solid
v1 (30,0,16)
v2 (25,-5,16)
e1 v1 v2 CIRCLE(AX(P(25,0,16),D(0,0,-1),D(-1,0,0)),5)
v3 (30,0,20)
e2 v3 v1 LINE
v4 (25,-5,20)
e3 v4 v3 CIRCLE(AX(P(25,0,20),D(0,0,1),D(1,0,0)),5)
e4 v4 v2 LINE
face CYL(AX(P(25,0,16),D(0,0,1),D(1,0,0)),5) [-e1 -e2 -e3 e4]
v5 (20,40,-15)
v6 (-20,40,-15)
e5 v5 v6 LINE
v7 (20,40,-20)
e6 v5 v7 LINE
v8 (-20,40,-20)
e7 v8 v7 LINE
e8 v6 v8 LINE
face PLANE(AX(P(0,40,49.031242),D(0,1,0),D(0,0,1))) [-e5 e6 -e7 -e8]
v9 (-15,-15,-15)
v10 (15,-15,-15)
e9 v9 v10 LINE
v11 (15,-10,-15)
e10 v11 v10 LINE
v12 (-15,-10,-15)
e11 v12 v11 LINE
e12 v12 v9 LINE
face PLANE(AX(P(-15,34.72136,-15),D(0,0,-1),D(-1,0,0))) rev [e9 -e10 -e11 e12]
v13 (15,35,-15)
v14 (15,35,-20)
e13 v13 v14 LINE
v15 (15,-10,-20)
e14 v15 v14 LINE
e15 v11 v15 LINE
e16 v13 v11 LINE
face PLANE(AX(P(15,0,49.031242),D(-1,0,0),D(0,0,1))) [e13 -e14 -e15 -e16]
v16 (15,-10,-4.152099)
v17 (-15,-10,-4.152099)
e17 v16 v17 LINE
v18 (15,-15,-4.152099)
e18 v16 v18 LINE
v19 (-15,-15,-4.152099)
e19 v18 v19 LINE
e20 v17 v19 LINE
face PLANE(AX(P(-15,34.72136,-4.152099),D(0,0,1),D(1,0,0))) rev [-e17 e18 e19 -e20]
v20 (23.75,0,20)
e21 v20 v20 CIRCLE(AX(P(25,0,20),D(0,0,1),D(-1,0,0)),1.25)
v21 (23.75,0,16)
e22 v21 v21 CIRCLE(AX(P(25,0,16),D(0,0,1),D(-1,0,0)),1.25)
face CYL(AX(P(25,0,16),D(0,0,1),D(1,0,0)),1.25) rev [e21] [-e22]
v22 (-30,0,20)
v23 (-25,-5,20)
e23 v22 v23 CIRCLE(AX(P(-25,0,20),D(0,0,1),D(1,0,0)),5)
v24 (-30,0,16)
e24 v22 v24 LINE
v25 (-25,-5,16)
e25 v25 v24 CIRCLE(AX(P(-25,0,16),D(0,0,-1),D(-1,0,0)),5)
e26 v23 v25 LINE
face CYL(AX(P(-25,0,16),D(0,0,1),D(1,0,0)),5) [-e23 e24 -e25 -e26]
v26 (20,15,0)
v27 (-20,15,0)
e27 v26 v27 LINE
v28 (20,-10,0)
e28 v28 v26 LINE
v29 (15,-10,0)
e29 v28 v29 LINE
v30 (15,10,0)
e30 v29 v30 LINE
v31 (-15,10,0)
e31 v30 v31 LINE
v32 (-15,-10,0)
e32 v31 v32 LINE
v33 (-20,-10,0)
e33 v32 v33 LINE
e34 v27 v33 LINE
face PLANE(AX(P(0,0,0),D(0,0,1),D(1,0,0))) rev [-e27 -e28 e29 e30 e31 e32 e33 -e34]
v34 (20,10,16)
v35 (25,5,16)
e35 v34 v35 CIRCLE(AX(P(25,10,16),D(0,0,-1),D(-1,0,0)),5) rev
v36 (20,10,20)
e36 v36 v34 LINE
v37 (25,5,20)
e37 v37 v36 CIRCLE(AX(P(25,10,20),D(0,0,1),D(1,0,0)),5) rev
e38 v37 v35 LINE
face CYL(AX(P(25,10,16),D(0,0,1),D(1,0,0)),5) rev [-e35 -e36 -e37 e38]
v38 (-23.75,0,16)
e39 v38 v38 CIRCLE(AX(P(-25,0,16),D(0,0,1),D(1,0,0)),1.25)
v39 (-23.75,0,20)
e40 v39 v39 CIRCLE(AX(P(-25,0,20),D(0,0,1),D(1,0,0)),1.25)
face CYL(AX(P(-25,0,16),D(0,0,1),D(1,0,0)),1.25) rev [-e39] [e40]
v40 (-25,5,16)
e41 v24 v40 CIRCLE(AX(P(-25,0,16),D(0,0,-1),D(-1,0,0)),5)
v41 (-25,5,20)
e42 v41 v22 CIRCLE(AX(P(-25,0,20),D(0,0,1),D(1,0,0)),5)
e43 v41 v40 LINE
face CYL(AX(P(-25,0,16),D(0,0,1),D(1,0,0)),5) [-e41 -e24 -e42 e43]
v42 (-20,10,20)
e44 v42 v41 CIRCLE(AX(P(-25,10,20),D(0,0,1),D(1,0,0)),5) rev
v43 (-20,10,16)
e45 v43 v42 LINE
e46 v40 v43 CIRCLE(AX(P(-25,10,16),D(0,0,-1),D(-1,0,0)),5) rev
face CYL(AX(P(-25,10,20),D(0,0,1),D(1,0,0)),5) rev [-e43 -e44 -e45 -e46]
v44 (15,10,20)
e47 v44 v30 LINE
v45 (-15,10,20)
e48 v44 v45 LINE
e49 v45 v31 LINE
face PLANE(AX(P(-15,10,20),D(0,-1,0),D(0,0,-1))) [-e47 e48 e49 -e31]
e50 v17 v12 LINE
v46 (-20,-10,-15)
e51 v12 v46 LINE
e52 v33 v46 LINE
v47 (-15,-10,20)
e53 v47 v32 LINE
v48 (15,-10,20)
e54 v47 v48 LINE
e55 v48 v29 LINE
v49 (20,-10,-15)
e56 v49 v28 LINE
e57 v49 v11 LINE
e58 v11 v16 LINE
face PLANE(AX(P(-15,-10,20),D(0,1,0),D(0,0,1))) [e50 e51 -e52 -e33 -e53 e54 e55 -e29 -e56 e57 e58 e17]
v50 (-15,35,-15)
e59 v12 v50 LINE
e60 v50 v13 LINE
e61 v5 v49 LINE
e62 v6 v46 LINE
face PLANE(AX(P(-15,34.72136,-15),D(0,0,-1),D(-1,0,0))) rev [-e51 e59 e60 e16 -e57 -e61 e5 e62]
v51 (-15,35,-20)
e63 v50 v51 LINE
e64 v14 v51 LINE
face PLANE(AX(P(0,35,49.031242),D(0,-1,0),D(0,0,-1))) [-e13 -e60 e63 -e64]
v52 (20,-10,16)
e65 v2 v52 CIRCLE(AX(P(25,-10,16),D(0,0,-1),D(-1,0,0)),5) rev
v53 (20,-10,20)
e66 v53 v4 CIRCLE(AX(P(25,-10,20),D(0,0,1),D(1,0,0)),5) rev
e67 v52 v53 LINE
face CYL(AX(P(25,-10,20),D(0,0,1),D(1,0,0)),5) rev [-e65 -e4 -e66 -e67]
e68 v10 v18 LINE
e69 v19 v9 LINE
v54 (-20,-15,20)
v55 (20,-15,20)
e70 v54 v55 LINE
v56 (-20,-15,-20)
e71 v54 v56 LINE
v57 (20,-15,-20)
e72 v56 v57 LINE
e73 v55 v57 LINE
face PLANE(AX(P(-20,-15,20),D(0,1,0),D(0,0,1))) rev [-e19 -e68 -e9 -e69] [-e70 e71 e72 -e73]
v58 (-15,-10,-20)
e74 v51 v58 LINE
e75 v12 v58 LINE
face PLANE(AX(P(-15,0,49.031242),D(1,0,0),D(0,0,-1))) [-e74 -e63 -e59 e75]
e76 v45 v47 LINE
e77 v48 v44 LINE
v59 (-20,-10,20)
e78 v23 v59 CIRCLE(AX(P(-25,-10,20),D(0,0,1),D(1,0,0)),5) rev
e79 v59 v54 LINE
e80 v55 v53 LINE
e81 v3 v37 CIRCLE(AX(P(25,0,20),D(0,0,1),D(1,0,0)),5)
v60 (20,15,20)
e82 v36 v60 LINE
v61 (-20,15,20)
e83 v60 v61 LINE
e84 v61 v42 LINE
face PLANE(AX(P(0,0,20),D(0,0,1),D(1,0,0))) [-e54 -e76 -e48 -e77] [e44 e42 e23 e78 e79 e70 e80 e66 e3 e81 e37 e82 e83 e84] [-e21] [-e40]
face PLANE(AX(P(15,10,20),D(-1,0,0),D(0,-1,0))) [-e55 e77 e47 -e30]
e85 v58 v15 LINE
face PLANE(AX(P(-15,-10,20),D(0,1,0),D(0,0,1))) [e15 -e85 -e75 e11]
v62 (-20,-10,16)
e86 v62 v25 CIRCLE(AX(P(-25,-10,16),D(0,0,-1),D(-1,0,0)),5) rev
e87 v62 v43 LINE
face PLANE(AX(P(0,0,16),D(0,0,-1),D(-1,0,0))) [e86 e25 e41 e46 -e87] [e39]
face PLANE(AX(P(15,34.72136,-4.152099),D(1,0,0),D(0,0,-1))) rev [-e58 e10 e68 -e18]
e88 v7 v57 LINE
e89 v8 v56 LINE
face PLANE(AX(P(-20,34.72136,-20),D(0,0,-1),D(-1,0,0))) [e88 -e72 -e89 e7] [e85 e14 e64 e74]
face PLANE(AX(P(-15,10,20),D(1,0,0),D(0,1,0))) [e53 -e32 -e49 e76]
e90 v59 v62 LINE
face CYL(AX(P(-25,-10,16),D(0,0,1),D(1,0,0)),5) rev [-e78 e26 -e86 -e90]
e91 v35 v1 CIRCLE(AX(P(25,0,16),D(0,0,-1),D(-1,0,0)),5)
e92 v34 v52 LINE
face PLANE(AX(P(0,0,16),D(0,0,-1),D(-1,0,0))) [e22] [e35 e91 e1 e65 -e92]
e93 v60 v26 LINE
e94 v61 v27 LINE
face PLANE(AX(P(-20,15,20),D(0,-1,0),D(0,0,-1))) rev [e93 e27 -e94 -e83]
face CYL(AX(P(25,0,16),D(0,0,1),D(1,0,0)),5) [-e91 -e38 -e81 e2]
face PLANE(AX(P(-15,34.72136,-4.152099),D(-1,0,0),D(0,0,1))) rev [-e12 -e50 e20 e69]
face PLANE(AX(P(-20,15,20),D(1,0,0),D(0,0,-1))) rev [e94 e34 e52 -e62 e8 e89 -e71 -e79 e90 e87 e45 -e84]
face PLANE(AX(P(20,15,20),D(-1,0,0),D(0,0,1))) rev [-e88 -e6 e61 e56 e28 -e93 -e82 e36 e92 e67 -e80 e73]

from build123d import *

# Parameters (mm, degrees)
SKETCH1_W           = 40
SKETCH1_H           = 30
SKETCH1_W_2         = 30
SKETCH1_H_2         = 20
BOSS_EXTRUDE1_DEPTH = 20
SKETCH2_W           = 10
SKETCH2_H           = 10
SKETCH2_R           = 1.25
BOSS_EXTRUDE2_DEPTH = 4
FILLET1_START       = 16
FILLET1_DEPTH       = 4
FILLET1_2_DEPTH     = 4
SKETCH3_W           = 40
SKETCH3_H           = 20
SKETCH3_W_2         = 30
SKETCH3_H_2         = 10.847900724
BOSS_EXTRUDE3_DEPTH = 5
SKETCH4_W           = 15
SKETCH4_H           = 5
BOSS_EXTRUDE4_DEPTH = 5


with BuildPart() as part:
    # Sketch1 → Boss-Extrude1 (new body)
    with BuildSketch(Plane.XY):
        Rectangle(SKETCH1_W, SKETCH1_H)
        Rectangle(SKETCH1_W_2, SKETCH1_H_2, mode=Mode.SUBTRACT)
    extrude(amount=BOSS_EXTRUDE1_DEPTH)

    # Sketch2 → Boss-Extrude2 (add)
    # profile 1 of 2: a face of its own
    with BuildSketch(Plane.XY.offset(20)):
        with Locations((-25, 0)):
            Rectangle(SKETCH2_W, SKETCH2_H)
        with Locations((-25, 0)):
            Circle(SKETCH2_R, mode=Mode.SUBTRACT)
    # profile 2 of 2: a face of its own
    with BuildSketch(Plane.XY.offset(20)):
        with Locations((25, 0)):
            Rectangle(SKETCH2_W, SKETCH2_H)
        with Locations(Location((25, 0, 0), (0, 0, 180))):
            Circle(SKETCH2_R, mode=Mode.SUBTRACT)
    extrude(amount=-BOSS_EXTRUDE2_DEPTH)

    # Fillet1: read off the stored shape, not the designer's step
    # Fillet1 outline → Fillet1 (cut)
    with BuildSketch(Plane.XY.offset(FILLET1_START)):
        with BuildLine():
            ThreePointArc((30, 0), (28.535533906, -3.535533906), (25, -5))
            Line((25, -5), (30, -5))
            Line((30, -5), (30, 0))
        make_face()
        with BuildLine():
            ThreePointArc((25, 5), (28.535533906, 3.535533906), (30, 0))
            Line((30, 0), (30, 5))
            Line((30, 5), (25, 5))
        make_face()
        with BuildLine():
            ThreePointArc((-30, 0), (-28.535533906, 3.535533906), (-25, 5))
            Line((-25, 5), (-30, 5))
            Line((-30, 5), (-30, 0))
        make_face()
        with BuildLine():
            ThreePointArc((-25, -5), (-28.535533906, -3.535533906), (-30, 0))
            Line((-30, 0), (-30, -5))
            Line((-30, -5), (-25, -5))
        make_face()
    extrude(amount=FILLET1_DEPTH, mode=Mode.SUBTRACT)

    # Fillet1 2 outline → Fillet1 2 (add)
    with BuildSketch(Plane.XY.offset(FILLET1_START)):
        with BuildLine():
            ThreePointArc((20, -10), (21.464466094, -6.464466094), (25, -5))
            Line((25, -5), (20, -5))
            Line((20, -5), (20, -10))
        make_face()
        with BuildLine():
            Line((20, 5), (25, 5))
            ThreePointArc((25, 5), (21.464466094, 6.464466094), (20, 10))
            Line((20, 10), (20, 5))
        make_face()
        with BuildLine():
            ThreePointArc((-20, 10), (-21.464466094, 6.464466094), (-25, 5))
            Line((-25, 5), (-20, 5))
            Line((-20, 5), (-20, 10))
        make_face()
        with BuildLine():
            Line((-20, -5), (-25, -5))
            ThreePointArc((-25, -5), (-21.464466094, -6.464466094), (-20, -10))
            Line((-20, -10), (-20, -5))
        make_face()
    extrude(amount=FILLET1_2_DEPTH)

    # Sketch3 → Boss-Extrude3 (add)
    with BuildSketch(Plane.XZ.offset(15)):
        with Locations((0, -10)):
            Rectangle(SKETCH3_W, SKETCH3_H)
        with Locations((0, -9.576049638)):
            Rectangle(SKETCH3_W_2, SKETCH3_H_2, mode=Mode.SUBTRACT)
    extrude(amount=-BOSS_EXTRUDE3_DEPTH)

    # Sketch4 → Boss-Extrude4 (add)
    with BuildSketch(Plane(origin=(0, 0, -20), x_dir=(-1, 0, 0), z_dir=(0, 0, -1))):
        Polygon((20, 40), (15, 40), (15, 35), (15, -10), (20, -10), align=None)
        with Locations((7.5, 37.5)):
            Rectangle(SKETCH4_W, SKETCH4_H)
        with Locations((-7.5, 37.5)):
            Rectangle(SKETCH4_W, SKETCH4_H)
        Polygon((-15, 35), (-15, 40), (-20, 40), (-20, -10), (-15, -10), align=None)
    extrude(amount=-BOSS_EXTRUDE4_DEPTH)


solid = part.part
